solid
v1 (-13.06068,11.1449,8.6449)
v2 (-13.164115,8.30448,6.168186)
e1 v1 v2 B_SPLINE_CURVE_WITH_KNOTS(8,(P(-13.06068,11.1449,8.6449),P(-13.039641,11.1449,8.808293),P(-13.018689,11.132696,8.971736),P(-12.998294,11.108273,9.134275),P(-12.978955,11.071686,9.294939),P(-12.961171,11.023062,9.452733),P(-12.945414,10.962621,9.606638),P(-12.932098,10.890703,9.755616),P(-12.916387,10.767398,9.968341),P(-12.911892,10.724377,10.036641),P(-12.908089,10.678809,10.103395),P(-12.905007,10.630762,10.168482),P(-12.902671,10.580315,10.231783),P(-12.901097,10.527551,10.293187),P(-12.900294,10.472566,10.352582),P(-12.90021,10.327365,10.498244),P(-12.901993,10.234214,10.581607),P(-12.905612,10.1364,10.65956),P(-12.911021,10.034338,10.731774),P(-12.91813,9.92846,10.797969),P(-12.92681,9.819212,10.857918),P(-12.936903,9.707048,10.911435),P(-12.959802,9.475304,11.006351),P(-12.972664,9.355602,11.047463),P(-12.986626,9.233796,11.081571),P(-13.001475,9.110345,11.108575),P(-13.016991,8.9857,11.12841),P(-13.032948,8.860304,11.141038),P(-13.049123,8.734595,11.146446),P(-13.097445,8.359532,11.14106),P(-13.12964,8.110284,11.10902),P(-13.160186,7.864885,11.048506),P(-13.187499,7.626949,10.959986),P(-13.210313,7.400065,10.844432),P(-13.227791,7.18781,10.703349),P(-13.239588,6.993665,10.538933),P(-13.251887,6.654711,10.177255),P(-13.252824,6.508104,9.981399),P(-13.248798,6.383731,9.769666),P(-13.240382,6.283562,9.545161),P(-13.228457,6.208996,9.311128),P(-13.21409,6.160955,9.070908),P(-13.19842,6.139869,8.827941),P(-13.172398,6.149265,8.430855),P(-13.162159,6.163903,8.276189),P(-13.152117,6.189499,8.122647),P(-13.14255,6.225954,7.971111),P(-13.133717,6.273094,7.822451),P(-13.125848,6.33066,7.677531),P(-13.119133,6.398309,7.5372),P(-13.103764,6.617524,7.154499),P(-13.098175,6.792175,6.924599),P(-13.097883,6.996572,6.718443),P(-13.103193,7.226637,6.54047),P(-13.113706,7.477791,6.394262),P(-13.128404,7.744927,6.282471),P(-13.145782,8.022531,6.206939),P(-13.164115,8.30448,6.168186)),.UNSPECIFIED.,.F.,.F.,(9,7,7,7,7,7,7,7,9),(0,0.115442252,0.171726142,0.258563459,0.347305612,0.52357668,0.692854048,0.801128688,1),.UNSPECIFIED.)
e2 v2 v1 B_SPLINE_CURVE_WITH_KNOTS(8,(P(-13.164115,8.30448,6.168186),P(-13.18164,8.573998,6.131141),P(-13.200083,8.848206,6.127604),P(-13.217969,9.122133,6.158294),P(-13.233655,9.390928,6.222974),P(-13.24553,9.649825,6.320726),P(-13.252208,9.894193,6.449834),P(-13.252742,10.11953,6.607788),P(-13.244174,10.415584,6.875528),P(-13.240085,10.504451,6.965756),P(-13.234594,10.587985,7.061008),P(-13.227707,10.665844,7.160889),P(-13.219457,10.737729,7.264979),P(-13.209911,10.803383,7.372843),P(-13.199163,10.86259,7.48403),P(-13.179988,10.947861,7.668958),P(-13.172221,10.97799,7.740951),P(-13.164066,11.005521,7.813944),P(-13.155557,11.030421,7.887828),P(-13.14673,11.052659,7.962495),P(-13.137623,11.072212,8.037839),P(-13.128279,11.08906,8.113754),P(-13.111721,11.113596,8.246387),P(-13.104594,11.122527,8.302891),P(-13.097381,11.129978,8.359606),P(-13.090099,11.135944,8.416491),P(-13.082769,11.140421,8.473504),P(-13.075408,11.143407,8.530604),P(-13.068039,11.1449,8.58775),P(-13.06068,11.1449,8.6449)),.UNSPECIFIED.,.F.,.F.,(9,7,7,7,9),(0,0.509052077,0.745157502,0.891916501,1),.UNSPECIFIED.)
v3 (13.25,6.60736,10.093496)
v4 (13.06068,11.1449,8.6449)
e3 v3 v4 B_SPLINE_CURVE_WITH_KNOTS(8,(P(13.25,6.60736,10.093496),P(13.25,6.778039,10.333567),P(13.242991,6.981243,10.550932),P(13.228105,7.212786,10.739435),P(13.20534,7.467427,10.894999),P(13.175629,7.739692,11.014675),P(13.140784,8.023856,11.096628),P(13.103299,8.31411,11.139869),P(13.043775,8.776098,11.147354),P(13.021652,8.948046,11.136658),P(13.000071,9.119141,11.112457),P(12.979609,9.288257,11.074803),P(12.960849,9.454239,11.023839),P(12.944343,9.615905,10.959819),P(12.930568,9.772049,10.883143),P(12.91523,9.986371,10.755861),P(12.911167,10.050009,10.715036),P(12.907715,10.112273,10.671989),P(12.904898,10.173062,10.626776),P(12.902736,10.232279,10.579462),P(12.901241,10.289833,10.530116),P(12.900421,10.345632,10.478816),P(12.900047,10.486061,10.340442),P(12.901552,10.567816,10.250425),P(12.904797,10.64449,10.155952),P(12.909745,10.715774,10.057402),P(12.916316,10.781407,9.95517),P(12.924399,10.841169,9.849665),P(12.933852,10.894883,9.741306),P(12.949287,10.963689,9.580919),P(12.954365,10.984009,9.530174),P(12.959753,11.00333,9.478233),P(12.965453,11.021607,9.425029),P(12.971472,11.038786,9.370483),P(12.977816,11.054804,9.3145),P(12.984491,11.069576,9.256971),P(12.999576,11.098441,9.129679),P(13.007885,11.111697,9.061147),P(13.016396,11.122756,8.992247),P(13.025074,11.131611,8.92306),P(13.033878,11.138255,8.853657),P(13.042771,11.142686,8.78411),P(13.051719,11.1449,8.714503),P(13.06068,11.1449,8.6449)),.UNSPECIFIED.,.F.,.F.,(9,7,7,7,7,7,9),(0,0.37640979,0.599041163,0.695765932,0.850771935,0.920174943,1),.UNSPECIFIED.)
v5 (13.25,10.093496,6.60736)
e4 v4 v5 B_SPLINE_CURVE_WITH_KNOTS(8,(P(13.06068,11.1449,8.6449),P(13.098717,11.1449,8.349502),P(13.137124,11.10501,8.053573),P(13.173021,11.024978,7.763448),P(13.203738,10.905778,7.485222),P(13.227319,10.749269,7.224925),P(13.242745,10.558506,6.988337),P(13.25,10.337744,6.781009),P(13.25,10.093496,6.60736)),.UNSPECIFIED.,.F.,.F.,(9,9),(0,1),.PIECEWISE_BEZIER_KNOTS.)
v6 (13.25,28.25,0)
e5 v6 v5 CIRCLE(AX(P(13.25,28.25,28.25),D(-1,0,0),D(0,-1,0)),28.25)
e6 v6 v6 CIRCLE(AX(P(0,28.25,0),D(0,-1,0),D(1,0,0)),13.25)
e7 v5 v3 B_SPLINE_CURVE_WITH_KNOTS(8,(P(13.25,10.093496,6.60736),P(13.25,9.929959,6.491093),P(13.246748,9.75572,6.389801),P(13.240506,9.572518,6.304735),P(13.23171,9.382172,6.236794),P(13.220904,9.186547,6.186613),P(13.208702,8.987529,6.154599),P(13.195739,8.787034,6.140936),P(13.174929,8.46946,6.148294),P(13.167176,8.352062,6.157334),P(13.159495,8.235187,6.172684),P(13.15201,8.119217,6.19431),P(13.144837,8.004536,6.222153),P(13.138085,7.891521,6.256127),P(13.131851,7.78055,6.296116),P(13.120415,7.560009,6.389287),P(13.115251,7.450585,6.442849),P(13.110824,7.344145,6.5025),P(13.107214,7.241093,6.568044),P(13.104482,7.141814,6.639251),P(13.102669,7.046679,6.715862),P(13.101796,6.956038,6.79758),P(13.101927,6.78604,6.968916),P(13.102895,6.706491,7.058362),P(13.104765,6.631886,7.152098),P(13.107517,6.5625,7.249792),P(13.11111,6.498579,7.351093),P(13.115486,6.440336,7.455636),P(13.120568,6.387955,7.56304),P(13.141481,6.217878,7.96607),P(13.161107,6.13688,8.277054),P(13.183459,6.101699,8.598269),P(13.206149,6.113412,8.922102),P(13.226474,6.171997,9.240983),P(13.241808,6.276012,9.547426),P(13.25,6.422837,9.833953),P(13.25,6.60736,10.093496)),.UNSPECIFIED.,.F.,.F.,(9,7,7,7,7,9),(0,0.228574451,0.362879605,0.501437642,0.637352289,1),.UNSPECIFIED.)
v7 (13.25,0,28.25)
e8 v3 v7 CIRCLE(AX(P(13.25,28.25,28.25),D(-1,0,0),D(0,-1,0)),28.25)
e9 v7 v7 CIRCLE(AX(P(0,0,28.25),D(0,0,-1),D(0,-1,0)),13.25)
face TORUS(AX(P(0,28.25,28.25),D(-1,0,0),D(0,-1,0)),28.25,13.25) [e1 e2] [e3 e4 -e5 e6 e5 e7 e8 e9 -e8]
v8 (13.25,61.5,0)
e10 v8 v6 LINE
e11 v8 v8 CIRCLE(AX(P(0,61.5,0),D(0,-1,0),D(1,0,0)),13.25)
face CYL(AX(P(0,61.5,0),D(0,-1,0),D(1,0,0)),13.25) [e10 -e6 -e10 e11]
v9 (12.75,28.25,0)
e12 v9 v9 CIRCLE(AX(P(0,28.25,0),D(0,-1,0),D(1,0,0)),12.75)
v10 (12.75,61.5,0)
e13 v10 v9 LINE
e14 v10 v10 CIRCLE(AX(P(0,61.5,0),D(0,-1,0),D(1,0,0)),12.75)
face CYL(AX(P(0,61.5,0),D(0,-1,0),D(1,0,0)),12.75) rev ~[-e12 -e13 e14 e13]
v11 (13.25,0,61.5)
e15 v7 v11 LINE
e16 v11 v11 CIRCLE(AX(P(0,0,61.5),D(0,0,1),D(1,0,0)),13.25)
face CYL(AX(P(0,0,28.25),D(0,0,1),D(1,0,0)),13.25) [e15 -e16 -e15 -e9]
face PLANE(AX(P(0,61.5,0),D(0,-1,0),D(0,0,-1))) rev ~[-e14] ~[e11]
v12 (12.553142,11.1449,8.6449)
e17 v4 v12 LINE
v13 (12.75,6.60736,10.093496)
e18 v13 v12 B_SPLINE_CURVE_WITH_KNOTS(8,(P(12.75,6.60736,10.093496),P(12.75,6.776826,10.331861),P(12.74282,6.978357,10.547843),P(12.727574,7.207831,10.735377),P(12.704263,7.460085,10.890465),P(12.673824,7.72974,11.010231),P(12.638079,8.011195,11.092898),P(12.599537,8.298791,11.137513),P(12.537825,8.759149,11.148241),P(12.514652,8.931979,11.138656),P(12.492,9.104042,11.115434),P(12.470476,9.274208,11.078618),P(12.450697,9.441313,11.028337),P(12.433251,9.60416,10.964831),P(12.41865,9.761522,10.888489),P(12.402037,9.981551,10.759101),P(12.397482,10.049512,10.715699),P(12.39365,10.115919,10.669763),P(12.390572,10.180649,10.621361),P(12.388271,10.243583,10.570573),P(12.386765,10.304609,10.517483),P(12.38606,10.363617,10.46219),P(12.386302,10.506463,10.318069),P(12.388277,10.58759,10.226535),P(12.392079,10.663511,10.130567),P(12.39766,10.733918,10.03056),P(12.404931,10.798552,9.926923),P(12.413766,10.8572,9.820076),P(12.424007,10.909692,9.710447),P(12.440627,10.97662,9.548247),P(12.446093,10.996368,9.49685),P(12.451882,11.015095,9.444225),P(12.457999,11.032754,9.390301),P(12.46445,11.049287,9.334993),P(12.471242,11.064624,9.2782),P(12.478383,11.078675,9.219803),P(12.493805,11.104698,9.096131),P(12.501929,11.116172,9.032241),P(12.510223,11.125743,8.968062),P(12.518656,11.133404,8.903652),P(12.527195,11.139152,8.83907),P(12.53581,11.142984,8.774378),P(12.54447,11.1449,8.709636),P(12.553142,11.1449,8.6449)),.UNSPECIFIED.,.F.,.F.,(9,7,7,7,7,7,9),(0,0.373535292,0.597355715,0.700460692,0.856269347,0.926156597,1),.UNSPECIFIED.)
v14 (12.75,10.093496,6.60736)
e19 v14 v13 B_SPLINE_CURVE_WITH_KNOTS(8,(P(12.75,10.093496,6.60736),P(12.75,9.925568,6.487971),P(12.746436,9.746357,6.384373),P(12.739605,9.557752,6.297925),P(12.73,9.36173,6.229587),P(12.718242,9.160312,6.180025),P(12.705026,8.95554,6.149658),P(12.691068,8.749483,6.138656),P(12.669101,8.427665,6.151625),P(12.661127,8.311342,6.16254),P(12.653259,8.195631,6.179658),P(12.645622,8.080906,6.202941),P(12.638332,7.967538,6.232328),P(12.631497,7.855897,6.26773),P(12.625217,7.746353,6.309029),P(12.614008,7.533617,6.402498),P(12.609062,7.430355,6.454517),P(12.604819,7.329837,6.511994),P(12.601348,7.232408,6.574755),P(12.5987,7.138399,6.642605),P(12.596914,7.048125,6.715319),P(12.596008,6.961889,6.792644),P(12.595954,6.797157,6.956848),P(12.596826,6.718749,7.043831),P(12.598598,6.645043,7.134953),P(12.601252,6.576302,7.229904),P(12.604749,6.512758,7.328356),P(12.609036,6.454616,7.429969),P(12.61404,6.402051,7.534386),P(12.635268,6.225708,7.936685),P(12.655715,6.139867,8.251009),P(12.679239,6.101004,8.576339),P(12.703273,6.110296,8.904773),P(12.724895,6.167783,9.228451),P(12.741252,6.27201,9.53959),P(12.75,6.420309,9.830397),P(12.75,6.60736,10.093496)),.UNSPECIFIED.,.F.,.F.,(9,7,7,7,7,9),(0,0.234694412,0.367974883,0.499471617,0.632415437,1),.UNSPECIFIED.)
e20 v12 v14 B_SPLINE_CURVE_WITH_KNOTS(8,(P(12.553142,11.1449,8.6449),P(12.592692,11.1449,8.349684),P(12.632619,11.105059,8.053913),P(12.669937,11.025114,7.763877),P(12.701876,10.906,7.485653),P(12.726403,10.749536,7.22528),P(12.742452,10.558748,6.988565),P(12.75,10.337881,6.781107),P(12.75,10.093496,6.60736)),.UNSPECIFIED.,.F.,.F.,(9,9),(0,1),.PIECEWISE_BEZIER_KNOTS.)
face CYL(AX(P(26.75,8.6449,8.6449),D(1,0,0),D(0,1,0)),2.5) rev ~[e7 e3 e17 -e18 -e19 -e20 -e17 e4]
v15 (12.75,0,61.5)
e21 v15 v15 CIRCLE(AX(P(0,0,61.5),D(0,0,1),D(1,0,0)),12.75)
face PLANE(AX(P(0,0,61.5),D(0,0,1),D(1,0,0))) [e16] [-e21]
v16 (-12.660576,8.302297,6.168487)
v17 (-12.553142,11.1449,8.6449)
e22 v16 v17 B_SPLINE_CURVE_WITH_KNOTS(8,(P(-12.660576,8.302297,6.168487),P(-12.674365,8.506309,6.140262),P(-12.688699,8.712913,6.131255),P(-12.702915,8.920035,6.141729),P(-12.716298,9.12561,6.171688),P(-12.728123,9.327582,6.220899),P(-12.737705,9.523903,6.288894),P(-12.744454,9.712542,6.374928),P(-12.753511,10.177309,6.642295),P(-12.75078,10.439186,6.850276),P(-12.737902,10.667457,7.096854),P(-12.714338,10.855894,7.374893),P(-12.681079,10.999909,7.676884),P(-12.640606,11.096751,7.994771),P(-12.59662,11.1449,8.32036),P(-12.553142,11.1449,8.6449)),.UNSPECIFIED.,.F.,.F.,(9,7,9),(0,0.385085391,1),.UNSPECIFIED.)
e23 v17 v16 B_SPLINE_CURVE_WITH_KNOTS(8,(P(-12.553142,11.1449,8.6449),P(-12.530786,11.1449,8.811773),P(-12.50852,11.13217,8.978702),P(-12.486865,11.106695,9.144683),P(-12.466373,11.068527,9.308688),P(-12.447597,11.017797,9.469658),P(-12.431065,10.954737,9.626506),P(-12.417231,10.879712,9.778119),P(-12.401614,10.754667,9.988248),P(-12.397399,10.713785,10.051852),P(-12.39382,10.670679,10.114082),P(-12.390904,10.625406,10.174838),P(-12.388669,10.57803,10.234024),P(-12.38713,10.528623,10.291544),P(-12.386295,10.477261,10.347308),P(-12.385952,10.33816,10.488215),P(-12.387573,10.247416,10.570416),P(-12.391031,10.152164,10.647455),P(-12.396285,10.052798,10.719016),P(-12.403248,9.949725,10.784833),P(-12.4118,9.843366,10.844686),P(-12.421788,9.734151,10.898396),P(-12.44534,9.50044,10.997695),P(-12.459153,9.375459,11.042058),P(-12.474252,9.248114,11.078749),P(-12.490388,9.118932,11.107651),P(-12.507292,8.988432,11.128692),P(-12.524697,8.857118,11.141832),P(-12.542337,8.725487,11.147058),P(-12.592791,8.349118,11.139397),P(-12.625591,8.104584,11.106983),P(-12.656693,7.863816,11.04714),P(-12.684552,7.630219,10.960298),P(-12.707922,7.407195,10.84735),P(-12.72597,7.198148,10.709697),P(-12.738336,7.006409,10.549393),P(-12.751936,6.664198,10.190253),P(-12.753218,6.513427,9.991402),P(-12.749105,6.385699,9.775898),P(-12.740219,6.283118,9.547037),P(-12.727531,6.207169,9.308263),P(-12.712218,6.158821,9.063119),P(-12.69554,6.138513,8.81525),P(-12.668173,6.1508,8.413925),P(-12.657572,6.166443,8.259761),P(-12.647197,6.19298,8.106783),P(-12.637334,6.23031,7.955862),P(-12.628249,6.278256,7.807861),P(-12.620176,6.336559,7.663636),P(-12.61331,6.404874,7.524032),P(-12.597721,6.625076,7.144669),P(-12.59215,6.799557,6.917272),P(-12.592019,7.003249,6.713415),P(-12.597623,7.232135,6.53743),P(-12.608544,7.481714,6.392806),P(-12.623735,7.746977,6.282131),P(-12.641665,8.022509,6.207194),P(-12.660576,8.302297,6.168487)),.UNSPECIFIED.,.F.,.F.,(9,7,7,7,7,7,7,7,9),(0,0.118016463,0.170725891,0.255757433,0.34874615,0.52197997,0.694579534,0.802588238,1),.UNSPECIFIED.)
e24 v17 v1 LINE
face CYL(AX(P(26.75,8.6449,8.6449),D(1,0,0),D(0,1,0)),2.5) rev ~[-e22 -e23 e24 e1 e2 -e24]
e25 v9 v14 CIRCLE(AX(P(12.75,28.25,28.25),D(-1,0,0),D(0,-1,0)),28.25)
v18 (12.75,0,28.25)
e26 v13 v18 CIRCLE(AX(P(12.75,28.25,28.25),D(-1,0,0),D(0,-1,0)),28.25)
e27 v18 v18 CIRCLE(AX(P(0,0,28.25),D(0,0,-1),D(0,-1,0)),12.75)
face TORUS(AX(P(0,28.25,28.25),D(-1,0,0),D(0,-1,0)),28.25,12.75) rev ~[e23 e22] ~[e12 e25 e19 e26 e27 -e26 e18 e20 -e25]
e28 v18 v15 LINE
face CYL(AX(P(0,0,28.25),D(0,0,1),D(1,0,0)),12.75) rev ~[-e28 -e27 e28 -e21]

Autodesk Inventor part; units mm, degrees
ref_plane "Work Plane1" through (0, 0, 61.5) normal (0, 0, 1) x (1, 0, 0)
sketch "Sketch1" plane through (0, 0, 61.5) normal (0, 0, 1) x (1, 0, 0)
  circle A0 centre (0, 0) radius 13.25
  dimension "d1" = 26.5
ref_plane "Work Plane2" through (0, 61.5, 0) normal (0, 1, 0) x (-1, 0, 0)
sketch "Sketch2" plane through (0, 61.5, 0) normal (0, 1, 0) x (-1, 0, 0)
  circle A0 centre (0, 0) radius 13.25
  dimension "d3" = 26.5
sketch "Sketch3" plane through (0, 0, 0) normal (1, 0, 0) x (0, 1, 0)
  line L0 (13.25, 61.5) -> (-13.25, 61.5) construction
  line L1 (61.5, -13.25) -> (61.5, 13.25) construction
  line L2 (0, -28.2) -> (0, 76.45) construction
  line L3 (-28.2, 0) -> (76.45, 0) construction
  line L4 (0, 0) -> (0, 61.5)
  line L5 (0, 0) -> (61.5, 0)
  line L6 (61.5, 13.25) -> (28.25, 13.25)
  line L7 (13.25, 28.25) -> (13.25, 61.5)
  arc A0 (13.25, 28.25) -> (28.25, 13.25) centre (28.25, 28.25) ccw
  dimension "d4" = 15
sweep "Sweep1" add profiles "Sketch1" path "Sketch3" path curves L7 A0 L6
shell "Shell1" thickness 0.5 removed faces 2 at (0.1548, 61.5, -7.494) at (-0.404, -5.4414, 61.5)
ref_plane "Work Plane3" through (26.75, 0, 0) normal (1, 0, 0) x (0, 1, 0)
sketch "Sketch4" plane through (26.75, 0, 0) normal (1, 0, 0) x (0, 1, 0)
  circle A0 centre (8.6449, 8.6449) radius 2.5
  point P0 (0, 0)
extrude "Extrusion1" cut sketch "Sketch4" against normal through all
properties part number "knee 90"
